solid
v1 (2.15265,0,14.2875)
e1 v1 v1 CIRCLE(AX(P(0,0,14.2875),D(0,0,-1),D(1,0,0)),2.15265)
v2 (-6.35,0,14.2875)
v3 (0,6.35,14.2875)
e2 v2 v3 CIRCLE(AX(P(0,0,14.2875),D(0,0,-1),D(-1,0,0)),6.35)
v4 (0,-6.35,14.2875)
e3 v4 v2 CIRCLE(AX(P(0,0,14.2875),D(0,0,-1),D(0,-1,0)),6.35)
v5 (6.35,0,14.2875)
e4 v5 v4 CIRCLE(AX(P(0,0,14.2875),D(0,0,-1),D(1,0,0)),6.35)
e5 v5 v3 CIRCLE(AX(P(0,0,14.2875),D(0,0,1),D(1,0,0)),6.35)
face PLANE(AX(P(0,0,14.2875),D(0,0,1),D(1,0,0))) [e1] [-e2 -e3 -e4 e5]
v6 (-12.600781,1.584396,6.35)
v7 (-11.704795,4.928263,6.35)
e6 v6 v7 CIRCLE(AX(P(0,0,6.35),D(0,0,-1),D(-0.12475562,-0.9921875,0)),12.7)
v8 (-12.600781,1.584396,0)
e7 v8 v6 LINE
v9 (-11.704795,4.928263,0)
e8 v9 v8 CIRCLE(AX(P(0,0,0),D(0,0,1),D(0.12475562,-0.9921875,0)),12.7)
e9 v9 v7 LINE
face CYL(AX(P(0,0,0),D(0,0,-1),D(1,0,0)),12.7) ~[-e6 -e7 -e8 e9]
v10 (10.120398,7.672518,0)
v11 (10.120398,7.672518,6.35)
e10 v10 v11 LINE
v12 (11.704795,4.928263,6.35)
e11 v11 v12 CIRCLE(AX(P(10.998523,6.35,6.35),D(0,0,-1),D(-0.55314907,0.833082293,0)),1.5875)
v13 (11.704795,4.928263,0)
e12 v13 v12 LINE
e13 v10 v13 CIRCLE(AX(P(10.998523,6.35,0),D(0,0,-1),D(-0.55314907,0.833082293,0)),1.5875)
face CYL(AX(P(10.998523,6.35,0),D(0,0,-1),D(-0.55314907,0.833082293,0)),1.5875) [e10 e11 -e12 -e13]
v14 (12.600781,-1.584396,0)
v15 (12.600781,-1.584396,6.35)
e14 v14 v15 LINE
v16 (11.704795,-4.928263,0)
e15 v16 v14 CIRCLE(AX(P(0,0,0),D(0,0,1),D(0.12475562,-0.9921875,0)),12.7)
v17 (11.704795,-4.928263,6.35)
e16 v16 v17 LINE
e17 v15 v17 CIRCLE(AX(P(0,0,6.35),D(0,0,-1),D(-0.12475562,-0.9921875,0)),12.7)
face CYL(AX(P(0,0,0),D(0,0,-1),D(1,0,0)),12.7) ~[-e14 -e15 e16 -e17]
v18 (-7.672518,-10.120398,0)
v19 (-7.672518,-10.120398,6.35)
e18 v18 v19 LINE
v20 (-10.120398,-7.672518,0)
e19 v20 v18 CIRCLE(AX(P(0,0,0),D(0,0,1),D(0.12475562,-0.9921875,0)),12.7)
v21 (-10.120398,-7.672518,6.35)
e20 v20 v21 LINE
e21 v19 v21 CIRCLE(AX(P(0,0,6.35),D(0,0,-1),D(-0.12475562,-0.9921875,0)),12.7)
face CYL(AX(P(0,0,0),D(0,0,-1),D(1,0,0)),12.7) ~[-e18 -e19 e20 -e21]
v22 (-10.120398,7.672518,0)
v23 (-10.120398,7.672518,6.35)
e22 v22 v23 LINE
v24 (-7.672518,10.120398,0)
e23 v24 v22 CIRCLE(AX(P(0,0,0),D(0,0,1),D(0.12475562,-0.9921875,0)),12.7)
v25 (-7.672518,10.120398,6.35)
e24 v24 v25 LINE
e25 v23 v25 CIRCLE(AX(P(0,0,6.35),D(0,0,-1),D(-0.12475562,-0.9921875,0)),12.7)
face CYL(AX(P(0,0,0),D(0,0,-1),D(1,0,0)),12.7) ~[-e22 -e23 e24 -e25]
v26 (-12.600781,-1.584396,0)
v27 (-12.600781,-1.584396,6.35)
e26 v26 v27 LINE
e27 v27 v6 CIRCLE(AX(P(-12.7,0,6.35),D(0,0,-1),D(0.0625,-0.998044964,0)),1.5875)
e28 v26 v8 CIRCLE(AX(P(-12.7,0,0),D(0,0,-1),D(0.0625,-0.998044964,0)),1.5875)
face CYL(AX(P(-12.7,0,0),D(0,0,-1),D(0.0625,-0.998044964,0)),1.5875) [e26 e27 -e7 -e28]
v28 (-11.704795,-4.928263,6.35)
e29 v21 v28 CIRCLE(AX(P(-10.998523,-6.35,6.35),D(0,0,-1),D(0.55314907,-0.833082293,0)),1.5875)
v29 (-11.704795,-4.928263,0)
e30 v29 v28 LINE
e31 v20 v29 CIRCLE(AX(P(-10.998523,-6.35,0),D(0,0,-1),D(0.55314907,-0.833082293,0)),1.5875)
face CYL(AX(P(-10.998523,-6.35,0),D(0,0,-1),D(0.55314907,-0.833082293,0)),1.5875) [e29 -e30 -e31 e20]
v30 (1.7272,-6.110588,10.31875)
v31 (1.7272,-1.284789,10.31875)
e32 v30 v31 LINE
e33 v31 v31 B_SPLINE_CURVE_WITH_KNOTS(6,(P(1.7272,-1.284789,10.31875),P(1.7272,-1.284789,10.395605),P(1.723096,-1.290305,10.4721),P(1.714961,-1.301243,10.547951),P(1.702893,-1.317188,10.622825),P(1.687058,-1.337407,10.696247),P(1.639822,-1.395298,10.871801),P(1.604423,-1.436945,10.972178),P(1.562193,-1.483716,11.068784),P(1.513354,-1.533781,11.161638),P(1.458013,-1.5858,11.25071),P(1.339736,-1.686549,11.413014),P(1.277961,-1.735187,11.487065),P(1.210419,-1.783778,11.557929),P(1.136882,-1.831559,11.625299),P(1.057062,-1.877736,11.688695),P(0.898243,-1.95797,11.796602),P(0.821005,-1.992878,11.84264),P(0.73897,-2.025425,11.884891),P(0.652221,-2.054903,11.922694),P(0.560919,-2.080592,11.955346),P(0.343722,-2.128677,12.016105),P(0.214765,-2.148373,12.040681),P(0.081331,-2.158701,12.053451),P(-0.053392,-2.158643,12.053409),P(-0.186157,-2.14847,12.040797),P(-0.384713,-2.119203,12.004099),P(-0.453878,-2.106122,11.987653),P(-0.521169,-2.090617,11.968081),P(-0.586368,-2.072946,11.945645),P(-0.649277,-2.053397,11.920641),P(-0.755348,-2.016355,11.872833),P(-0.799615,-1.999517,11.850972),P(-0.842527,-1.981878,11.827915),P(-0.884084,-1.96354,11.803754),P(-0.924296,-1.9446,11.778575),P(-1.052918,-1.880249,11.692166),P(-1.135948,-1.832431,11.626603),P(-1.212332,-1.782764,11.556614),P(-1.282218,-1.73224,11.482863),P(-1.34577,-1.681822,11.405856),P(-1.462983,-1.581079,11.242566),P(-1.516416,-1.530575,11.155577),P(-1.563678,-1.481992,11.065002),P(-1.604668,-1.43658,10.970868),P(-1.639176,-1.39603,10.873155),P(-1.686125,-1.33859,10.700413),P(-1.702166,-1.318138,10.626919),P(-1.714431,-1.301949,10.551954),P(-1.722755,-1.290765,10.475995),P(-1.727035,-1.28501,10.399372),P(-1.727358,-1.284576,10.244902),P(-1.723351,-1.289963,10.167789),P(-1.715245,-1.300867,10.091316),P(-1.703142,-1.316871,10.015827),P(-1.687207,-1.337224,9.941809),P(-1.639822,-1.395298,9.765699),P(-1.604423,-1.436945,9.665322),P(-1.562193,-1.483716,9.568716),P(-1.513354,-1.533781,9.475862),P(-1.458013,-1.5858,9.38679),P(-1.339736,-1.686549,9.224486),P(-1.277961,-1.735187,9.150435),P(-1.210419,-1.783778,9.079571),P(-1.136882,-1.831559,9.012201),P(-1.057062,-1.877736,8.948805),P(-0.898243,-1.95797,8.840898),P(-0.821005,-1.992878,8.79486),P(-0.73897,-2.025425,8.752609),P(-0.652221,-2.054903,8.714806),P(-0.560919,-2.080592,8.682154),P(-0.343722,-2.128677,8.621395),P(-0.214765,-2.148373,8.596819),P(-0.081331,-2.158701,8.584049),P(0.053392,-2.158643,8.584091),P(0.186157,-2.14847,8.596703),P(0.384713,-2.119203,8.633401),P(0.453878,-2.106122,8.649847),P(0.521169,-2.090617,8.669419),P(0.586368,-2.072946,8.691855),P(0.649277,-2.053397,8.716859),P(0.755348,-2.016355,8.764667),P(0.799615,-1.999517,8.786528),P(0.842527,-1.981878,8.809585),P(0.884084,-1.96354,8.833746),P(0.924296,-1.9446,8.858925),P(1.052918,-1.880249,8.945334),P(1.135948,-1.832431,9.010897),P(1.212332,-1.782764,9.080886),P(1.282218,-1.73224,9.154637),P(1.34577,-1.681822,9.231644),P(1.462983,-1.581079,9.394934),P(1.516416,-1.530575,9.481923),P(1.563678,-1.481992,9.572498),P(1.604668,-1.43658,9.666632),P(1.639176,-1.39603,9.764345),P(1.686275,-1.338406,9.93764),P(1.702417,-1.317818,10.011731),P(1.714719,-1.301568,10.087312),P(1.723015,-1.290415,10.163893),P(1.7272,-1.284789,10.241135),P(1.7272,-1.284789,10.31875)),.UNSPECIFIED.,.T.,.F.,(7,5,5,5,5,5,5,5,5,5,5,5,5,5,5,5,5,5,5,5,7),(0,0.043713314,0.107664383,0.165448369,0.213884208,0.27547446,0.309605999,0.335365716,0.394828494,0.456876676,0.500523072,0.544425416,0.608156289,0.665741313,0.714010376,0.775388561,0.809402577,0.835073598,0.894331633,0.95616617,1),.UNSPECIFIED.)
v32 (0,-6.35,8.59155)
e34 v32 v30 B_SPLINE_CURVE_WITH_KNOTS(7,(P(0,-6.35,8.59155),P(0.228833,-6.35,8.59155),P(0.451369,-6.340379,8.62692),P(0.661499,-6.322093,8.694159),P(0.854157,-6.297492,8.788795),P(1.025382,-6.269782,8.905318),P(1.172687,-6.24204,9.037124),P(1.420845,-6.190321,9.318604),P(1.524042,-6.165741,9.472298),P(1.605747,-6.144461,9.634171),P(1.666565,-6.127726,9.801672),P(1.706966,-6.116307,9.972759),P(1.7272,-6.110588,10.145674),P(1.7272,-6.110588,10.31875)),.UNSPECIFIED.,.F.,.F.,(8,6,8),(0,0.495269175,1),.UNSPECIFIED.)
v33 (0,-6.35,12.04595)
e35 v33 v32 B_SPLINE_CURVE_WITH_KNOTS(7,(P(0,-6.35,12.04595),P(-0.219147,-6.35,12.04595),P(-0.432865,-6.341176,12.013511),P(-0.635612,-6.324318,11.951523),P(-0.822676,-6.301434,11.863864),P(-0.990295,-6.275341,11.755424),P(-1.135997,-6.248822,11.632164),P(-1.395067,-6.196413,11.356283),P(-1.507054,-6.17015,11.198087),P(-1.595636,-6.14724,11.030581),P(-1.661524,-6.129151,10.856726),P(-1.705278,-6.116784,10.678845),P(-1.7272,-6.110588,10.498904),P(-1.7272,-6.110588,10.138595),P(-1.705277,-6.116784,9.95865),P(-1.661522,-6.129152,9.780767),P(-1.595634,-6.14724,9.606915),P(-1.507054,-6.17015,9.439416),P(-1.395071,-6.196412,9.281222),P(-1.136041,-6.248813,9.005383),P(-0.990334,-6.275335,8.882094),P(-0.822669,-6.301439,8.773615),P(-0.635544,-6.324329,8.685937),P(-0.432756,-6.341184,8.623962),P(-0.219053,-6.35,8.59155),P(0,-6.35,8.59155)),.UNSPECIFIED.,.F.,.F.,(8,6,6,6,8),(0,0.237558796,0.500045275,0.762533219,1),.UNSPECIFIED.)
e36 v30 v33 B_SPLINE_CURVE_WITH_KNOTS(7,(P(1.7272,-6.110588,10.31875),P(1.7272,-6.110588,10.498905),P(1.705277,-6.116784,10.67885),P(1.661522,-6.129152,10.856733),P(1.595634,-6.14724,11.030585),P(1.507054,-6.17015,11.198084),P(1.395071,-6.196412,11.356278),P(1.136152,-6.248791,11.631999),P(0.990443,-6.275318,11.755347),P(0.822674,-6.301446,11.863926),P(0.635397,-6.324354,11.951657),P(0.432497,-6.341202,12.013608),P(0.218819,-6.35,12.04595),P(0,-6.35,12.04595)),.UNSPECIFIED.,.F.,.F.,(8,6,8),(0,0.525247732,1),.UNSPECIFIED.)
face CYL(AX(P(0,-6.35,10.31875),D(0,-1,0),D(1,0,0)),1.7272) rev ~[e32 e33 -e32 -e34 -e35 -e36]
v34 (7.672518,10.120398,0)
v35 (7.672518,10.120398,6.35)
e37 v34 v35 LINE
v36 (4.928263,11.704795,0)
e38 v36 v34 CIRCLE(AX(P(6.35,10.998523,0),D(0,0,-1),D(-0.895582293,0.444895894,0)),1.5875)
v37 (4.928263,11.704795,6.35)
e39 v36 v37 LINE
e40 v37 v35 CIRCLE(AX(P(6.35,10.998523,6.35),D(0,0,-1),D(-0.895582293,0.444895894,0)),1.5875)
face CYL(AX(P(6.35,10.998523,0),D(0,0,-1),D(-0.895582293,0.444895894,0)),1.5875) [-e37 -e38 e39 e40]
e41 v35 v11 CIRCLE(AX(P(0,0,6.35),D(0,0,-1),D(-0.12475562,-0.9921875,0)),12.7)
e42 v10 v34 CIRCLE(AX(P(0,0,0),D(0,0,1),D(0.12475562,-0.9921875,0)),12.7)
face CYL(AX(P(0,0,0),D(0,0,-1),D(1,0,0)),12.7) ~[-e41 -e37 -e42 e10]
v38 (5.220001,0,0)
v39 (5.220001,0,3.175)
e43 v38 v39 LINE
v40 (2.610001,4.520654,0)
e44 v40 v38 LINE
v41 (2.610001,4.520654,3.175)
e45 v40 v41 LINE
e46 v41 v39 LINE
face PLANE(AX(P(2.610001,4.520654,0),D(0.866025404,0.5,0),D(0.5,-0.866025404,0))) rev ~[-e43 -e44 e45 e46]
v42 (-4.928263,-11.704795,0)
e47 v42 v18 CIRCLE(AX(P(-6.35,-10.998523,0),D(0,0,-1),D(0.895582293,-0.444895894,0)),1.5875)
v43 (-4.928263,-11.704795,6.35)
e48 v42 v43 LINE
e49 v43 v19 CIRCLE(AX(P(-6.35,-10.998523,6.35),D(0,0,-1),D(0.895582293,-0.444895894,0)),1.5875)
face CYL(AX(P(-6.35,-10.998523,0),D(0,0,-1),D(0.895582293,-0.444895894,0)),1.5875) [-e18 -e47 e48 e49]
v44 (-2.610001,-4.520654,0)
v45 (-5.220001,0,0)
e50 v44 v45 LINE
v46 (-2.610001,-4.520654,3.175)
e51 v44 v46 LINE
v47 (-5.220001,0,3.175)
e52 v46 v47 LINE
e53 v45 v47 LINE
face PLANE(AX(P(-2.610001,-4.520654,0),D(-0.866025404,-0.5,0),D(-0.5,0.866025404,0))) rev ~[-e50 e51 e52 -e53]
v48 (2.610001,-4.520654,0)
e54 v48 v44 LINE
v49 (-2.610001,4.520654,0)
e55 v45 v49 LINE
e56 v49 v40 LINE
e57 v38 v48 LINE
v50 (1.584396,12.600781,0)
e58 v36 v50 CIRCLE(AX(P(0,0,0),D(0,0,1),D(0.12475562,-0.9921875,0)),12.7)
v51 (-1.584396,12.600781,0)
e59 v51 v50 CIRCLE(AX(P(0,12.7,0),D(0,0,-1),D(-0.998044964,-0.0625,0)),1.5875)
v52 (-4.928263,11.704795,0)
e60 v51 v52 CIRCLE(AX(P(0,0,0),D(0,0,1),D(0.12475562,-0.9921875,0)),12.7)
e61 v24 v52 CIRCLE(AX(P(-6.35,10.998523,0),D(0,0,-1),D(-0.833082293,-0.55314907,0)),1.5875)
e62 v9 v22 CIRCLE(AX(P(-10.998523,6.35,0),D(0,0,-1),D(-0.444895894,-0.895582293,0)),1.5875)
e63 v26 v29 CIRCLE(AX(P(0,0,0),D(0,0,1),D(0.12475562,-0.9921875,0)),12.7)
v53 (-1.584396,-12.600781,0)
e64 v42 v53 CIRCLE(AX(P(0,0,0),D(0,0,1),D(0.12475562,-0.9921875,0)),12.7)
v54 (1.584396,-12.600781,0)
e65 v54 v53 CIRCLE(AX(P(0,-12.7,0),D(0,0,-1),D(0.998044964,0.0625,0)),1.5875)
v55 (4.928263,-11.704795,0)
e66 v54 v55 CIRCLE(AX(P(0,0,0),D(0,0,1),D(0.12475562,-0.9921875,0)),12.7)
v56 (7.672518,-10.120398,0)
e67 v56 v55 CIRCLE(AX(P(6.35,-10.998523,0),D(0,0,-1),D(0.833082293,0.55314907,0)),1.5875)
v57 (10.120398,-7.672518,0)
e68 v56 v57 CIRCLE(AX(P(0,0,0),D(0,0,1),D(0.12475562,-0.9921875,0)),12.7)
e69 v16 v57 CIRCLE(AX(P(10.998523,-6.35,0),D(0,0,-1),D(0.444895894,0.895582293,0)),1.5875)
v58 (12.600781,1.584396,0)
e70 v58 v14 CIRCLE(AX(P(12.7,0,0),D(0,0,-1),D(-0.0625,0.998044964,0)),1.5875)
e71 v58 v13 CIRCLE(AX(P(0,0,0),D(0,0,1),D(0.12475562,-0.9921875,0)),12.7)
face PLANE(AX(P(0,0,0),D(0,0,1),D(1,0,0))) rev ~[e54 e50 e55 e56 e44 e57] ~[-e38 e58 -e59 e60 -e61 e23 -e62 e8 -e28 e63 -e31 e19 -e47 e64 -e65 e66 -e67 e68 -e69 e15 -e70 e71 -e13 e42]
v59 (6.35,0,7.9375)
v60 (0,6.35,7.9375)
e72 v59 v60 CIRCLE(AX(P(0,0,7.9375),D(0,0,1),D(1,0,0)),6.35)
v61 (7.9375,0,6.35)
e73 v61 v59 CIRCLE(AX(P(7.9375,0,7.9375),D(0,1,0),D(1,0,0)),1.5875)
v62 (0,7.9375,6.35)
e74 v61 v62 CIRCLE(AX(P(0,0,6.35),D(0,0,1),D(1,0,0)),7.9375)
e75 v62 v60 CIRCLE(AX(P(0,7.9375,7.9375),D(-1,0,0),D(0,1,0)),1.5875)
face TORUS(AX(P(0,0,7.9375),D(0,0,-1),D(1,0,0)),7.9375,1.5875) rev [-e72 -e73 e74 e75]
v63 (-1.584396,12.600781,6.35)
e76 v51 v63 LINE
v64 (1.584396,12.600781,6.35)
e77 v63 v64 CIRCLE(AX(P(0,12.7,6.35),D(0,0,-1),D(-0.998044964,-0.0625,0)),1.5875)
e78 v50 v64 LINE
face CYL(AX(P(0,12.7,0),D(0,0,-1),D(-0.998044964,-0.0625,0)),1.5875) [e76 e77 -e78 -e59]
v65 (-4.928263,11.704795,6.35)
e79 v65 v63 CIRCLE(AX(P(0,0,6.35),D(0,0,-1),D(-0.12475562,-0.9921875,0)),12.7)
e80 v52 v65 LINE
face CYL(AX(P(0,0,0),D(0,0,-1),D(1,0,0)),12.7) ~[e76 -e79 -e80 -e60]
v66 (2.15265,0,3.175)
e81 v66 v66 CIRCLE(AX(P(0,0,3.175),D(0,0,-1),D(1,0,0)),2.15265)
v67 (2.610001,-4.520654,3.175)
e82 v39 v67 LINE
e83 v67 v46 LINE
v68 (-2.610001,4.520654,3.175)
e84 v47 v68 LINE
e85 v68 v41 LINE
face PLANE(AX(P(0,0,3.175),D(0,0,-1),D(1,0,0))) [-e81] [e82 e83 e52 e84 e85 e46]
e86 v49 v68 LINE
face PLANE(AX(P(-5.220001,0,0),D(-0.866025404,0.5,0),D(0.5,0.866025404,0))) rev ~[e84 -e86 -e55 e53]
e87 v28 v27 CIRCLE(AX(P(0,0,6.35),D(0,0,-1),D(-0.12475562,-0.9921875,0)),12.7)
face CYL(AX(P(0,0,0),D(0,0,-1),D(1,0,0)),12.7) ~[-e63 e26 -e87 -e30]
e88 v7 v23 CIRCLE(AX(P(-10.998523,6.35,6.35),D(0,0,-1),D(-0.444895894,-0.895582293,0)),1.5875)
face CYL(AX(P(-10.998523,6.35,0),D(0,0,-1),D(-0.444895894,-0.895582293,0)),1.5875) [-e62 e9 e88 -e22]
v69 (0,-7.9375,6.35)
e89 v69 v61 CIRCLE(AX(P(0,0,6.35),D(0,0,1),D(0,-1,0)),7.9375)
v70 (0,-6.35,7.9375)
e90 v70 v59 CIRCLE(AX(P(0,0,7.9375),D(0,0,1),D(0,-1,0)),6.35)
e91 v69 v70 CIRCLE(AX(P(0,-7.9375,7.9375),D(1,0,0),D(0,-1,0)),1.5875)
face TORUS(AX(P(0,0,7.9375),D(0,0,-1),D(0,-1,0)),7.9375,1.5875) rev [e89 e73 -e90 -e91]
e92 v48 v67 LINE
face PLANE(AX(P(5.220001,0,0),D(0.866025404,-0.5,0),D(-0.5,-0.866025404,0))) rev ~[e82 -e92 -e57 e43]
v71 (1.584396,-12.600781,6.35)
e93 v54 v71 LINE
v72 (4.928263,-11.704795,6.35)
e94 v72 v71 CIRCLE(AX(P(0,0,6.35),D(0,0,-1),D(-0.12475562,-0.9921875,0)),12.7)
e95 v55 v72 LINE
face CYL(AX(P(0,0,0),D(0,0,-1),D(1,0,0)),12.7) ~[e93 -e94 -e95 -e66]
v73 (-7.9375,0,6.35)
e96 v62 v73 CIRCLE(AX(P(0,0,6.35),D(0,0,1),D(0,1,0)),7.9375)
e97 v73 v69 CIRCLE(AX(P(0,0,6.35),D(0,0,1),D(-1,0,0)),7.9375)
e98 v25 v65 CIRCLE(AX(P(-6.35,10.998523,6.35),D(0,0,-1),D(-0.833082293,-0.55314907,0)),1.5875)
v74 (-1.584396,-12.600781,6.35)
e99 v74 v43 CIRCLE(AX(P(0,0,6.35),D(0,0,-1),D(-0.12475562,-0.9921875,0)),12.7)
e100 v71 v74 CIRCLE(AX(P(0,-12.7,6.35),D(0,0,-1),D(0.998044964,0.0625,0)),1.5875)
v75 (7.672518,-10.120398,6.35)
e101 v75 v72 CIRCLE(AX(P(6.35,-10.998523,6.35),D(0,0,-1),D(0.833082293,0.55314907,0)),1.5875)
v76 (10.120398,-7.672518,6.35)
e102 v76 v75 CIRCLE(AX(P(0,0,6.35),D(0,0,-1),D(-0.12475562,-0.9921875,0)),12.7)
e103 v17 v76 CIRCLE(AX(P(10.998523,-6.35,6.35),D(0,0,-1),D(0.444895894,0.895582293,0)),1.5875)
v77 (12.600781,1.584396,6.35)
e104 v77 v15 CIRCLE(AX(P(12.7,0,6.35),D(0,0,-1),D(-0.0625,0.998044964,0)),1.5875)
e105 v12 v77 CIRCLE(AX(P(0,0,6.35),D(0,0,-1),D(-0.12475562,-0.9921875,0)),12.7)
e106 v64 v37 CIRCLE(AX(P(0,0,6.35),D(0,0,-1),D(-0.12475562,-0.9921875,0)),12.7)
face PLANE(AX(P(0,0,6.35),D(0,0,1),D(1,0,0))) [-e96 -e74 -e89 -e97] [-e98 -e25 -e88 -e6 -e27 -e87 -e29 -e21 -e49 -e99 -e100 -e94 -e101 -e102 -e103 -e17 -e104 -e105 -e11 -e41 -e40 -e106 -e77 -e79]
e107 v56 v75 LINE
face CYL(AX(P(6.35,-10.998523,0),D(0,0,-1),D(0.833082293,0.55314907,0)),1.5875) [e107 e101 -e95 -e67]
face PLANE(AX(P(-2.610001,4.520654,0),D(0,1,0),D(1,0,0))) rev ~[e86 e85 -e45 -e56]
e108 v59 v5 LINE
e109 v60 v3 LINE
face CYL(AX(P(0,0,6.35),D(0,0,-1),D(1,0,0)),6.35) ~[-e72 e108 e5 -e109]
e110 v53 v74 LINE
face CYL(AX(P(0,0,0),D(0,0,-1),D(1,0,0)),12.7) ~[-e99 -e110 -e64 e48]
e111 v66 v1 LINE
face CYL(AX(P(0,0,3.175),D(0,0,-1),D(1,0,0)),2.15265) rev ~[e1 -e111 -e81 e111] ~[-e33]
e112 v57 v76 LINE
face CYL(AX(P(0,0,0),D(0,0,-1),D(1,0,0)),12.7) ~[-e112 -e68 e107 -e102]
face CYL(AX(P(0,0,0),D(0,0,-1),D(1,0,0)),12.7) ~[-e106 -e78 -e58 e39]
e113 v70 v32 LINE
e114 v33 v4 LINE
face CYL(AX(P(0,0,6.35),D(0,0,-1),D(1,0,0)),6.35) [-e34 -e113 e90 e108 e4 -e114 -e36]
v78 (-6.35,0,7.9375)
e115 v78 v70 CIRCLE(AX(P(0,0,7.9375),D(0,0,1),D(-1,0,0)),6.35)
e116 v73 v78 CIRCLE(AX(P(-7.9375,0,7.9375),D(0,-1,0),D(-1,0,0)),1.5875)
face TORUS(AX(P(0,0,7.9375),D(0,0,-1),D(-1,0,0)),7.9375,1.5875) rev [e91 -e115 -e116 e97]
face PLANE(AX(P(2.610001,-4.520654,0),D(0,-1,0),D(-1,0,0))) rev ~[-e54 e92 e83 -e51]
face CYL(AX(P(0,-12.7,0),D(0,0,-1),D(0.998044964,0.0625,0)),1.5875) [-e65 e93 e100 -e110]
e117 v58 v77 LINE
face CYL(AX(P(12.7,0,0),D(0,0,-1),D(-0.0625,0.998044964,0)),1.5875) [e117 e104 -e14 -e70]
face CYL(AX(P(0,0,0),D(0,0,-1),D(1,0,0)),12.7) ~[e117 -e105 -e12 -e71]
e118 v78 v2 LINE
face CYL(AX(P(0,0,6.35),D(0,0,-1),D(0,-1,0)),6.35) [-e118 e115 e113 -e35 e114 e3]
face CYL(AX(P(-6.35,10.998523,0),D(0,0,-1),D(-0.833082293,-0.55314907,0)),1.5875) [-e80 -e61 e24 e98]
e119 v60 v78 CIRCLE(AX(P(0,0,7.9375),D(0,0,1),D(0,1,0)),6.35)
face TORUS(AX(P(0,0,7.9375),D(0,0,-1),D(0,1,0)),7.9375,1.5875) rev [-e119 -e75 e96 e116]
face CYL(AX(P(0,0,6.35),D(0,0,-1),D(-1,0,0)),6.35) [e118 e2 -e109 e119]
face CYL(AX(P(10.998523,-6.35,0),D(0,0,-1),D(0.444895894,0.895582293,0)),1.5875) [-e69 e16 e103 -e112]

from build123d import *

# Parameters (mm, degrees)
F0_R         = 12.7
F1_DEPTH     = 6.35
F3_DEPTH     = 3.175
F4_W         = 12.7
F4_H         = 12.7
F5_DEPTH     = 7.9375
F7_DEPTH     = 6.35
F8_COUNT     = 12
F8_ANGLE     = 330
F9_R         = 2.15265
F10_DEPTH    = 11.1125
F11_R        = 1.7272
F12_REACH    = 25.5237593299
F13_T1_DEPTH = 7.9375
F14_R        = 1.5875


# Not quite as in the source:
# - a fillet or chamfer that OpenCascade refuses, or shapes differently, is made with other operations: its cross-section is extruded or revolved along the edge and cut away or added


with BuildPart() as f1:
    # F0 (on Top) → F1 (new body)
    with BuildSketch(Plane.XY):
        Circle(F0_R)
    extrude(amount=F1_DEPTH)

    # F2 (on face) → F3 (cut)
    with BuildSketch(Plane(origin=(0, 0, 0), x_dir=(1, 0, 0), z_dir=(0, 0, -1))):
        Polygon((2.6100007461, 4.5206539), (-2.6100007461, 4.5206539), (-5.2200014922, 0), (-2.6100007461, -4.5206539), (2.6100007461, -4.5206539), (5.2200014922, 0), align=None)
    extrude(amount=-F3_DEPTH, mode=Mode.SUBTRACT)

    # F4 (on face) → F5 (join)
    with BuildSketch(Plane.XY.offset(6.35)):
        Rectangle(F4_W, F4_H)
    extrude(amount=F5_DEPTH)

    # F6 (on face) → F7 (join, through all)
    with BuildSketch(Plane(origin=(0, 0, 0), x_dir=(1, 0, 0), z_dir=(0, 0, -1))):
        with BuildLine():
            ThreePointArc((-1.5843963802, 12.60078125), (0, 12.7), (1.5843963802, 12.60078125))
            ThreePointArc((1.5843963802, 12.60078125), (0, 14.2875), (-1.5843963802, 12.60078125))
        make_face()
    f7 = extrude(amount=-F7_DEPTH)

    # F8: F7 ×12 about axis
    f8_axis = Axis((0, 0, 0), (0, 0, -1))
    for i in range(1, F8_COUNT):
        add(f7.rotate(f8_axis, i * F8_ANGLE / (F8_COUNT - 1)))

    # F9 (on face) → F10 (cut, through all)
    with BuildSketch(Plane(origin=(0, 0, 3.175), x_dir=(1, 0, 0), z_dir=(0, 0, -1))):
        Circle(F9_R)
    extrude(amount=-F10_DEPTH, mode=Mode.SUBTRACT)

    f12_end = f1.faces().sort_by_distance((-2.15265, 0, 8.73125))[0]
    # F11 (on face) → F12 (cut, up to a face of the model that its end follows)
    with BuildSketch(Plane.XZ.offset(6.35)):
        with Locations((0, 10.31875)):
            Circle(F11_R)
    f12_long = extrude(amount=-F12_REACH, mode=Mode.PRIVATE)
    add(split(f12_long, bisect_by=f12_end, keep=Keep.ALL, mode=Mode.PRIVATE).solids().sort_by_distance((0, -6.35, 10.31875))[0], mode=Mode.SUBTRACT)

    # F13: fillet of radius 6.35 on 4 edges, made by hand

    # F13_s2 → F13_t1 (cut)
    with BuildSketch(Plane.XY.offset(6.35)):
        with BuildLine():
            ThreePointArc((0, -6.35), (-4.4901280605, -4.4901280605), (-6.35, 0))
            Line((-6.35, 0), (-6.477, 0))
            Line((-6.477, 0), (-6.477, -6.477))
            Line((-6.477, -6.477), (0, -6.477))
            Line((0, -6.477), (0, -6.35))
        make_face()
        with BuildLine():
            ThreePointArc((6.35, 0), (4.4901280605, -4.4901280605), (0, -6.35))
            Line((0, -6.35), (0, -6.477))
            Line((0, -6.477), (6.477, -6.477))
            Line((6.477, -6.477), (6.477, 0))
            Line((6.477, 0), (6.35, 0))
        make_face()
        with BuildLine():
            ThreePointArc((6.35, 0), (4.4901280605, 4.4901280605), (0, 6.35))
            Line((0, 6.35), (0, 6.477))
            Line((0, 6.477), (6.477, 6.477))
            Line((6.477, 6.477), (6.477, 0))
            Line((6.477, 0), (6.35, 0))
        make_face()
        with BuildLine():
            ThreePointArc((-6.35, 0), (-4.4901280605, 4.4901280605), (0, 6.35))
            Line((0, 6.35), (0, 6.477))
            Line((0, 6.477), (-6.477, 6.477))
            Line((-6.477, 6.477), (-6.477, 0))
            Line((-6.477, 0), (-6.35, 0))
        make_face()
    extrude(amount=F13_T1_DEPTH, mode=Mode.SUBTRACT)

    # F14
    f14_edges = [f1.edges().sort_by_distance(p)[0] for p in [
        (4.490128, 4.490128, 6.35),
    ]]
    fillet(f14_edges, radius=F14_R)


solid = f1.part
